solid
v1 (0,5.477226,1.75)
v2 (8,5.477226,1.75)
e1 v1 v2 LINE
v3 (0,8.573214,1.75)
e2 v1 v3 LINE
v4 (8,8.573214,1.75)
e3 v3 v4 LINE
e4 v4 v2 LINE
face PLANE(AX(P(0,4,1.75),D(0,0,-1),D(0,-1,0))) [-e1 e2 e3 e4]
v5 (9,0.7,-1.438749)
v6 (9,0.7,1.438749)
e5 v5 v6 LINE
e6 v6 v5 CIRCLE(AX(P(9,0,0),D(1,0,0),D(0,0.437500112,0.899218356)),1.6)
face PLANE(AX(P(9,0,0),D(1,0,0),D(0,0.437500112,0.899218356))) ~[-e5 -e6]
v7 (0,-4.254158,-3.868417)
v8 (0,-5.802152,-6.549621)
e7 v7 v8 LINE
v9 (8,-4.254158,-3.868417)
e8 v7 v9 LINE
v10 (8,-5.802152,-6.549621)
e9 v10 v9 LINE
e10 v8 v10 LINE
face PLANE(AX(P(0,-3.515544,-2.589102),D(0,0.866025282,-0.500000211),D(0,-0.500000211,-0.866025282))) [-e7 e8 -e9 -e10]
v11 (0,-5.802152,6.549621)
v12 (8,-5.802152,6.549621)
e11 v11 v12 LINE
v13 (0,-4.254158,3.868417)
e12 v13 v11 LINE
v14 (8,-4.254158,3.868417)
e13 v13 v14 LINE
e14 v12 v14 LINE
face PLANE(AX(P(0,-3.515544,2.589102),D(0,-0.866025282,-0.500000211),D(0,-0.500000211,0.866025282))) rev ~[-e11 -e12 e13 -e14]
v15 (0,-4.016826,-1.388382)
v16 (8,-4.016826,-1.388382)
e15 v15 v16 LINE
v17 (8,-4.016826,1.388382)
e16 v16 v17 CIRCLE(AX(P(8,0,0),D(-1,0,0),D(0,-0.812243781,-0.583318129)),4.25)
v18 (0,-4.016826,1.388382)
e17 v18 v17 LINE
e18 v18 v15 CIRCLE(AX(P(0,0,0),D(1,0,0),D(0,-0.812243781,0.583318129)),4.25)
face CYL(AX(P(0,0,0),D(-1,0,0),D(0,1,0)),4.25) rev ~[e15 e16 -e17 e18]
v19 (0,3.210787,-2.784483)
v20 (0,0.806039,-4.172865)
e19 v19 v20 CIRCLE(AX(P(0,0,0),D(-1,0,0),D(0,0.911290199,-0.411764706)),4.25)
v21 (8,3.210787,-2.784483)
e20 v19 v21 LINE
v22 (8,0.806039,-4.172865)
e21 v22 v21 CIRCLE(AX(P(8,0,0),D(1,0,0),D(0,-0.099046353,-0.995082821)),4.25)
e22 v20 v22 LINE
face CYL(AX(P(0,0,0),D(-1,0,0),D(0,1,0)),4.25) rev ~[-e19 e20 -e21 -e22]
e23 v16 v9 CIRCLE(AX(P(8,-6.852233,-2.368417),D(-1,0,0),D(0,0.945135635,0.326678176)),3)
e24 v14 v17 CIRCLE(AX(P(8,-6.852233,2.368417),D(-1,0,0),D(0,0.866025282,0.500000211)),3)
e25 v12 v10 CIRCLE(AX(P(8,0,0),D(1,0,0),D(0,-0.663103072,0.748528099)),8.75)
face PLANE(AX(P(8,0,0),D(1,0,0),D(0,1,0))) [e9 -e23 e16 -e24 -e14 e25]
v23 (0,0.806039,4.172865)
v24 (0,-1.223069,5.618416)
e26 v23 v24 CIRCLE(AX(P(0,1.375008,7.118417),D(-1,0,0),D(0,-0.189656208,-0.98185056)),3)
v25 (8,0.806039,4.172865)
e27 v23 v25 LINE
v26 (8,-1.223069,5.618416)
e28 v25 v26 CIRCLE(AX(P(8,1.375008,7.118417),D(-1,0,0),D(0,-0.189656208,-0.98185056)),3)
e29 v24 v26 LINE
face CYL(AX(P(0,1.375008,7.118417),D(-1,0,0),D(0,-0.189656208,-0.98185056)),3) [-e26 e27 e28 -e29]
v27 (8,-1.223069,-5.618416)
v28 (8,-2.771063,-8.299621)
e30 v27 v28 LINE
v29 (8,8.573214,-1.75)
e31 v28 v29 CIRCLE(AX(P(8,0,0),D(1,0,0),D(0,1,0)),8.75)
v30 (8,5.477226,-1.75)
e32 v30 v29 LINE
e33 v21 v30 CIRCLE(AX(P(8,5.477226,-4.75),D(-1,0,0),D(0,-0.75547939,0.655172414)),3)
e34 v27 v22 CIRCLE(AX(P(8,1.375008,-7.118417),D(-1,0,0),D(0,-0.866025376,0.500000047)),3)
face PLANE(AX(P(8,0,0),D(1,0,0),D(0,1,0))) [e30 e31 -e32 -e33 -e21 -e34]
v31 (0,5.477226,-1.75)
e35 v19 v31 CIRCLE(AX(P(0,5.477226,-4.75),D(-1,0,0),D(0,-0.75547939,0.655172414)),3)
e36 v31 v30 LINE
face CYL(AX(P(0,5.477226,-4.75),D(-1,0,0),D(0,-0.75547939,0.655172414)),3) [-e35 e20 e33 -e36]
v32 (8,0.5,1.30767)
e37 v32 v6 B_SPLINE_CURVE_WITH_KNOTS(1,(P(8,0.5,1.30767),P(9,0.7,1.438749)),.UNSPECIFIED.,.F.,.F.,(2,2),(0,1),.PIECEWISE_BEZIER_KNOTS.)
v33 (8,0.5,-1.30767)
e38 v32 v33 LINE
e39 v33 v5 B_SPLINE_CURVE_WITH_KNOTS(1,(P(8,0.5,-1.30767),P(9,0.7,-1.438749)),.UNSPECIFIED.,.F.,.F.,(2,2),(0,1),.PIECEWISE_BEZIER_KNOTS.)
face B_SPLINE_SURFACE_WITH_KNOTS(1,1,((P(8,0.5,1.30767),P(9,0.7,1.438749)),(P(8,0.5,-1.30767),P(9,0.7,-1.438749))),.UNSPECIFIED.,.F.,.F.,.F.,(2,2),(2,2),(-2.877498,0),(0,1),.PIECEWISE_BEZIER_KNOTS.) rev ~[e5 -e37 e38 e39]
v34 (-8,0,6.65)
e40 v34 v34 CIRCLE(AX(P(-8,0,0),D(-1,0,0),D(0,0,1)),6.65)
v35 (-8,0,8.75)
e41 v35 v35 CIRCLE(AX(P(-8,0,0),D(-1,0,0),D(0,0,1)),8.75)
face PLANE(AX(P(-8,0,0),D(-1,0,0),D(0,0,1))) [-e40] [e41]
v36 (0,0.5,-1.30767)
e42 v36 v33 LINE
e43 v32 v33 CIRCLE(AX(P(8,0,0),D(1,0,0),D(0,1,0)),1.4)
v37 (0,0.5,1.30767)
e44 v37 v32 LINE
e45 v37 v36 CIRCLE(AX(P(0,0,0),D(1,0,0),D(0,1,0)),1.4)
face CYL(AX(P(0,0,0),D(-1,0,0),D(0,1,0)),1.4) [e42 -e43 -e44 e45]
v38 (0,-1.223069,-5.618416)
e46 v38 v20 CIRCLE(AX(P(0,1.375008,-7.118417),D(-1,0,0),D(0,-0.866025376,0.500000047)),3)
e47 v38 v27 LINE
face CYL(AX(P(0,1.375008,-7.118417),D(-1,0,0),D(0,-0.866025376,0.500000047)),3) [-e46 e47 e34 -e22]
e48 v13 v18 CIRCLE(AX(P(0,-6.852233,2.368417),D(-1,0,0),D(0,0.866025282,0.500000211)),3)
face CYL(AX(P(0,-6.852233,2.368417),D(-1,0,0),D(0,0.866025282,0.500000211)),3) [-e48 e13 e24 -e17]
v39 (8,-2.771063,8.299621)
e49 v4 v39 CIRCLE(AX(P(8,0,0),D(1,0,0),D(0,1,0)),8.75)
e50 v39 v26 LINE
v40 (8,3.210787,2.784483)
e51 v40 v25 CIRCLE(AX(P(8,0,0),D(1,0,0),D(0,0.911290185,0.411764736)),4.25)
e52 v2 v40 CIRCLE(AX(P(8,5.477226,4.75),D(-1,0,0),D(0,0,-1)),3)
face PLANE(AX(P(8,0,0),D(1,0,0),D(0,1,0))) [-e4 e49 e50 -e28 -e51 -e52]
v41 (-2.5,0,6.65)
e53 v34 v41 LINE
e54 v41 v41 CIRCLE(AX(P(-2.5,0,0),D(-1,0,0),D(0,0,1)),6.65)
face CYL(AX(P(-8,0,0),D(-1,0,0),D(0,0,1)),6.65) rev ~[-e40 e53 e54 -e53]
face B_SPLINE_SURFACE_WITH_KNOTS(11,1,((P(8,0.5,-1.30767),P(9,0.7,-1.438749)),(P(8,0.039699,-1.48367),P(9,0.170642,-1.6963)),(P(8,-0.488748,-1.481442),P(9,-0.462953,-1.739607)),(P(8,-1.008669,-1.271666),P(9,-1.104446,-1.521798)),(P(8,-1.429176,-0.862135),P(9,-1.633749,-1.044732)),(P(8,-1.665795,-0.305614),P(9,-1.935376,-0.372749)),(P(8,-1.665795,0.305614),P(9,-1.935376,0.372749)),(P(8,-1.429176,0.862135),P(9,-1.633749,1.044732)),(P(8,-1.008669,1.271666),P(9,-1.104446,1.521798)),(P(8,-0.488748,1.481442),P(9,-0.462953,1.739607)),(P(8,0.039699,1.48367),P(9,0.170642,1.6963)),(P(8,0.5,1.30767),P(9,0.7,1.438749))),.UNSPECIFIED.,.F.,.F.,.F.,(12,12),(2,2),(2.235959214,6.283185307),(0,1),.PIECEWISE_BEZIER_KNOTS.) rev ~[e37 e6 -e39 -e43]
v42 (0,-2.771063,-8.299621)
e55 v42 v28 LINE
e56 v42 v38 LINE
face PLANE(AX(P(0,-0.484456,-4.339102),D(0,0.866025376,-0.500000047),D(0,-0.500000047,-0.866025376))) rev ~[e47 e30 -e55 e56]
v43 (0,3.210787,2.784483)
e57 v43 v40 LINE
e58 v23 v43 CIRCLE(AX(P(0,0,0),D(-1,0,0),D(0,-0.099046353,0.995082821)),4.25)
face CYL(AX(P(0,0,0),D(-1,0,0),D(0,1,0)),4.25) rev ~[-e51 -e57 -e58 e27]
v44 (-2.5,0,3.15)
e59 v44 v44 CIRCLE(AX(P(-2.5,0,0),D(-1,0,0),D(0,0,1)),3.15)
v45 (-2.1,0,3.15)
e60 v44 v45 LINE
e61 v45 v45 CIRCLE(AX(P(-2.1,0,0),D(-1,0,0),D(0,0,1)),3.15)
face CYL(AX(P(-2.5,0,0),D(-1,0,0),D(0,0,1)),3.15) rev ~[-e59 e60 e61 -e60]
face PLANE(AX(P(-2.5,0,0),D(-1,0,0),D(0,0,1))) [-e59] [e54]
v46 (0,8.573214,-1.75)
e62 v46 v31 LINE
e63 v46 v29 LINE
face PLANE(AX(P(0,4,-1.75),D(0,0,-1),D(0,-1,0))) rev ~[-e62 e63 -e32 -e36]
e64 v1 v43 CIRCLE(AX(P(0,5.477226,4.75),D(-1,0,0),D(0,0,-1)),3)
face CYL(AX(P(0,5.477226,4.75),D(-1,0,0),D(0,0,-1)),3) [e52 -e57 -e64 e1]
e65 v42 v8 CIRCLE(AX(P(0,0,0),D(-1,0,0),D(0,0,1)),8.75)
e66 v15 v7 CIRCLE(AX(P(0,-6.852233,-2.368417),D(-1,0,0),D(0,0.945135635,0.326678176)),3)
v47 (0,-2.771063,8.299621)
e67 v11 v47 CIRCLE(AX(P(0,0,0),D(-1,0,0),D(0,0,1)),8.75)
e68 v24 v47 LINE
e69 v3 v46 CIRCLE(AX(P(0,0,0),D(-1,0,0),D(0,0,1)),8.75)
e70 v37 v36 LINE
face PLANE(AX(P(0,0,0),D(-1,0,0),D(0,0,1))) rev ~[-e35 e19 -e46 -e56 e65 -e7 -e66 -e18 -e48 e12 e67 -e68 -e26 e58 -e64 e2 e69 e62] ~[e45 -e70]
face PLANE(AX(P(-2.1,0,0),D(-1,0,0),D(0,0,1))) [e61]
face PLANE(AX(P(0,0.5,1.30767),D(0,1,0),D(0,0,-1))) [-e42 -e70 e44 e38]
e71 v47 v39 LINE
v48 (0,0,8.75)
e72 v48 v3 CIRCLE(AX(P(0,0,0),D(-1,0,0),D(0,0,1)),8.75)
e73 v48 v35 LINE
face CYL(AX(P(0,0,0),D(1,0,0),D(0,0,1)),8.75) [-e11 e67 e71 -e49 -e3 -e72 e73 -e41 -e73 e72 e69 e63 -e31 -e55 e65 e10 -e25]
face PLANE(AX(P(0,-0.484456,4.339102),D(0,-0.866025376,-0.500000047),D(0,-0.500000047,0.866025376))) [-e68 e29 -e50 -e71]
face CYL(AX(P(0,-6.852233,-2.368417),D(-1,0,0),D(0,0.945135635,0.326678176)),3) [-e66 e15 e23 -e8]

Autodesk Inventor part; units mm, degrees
ref_plane "YZ Plane" through (0, 0, 0) normal (1, 0, 0) x (0, 1, 0)
ref_plane "XZ Plane" through (0, 0, 0) normal (0, 1, 0) x (-1, 0, 0)
sketch "Sketch1" plane through (0, 0, 0) normal (1, 0, 0) x (0, 1, 0)
  circle A0 centre (0, 0) radius 1.4
  line L0 (0.5, 1.30767) -> (0.5, -1.30767)
  dimension "d1" = 2.8
  dimension "d2" = 0.5
extrude "Extrusion1" add sketch "Sketch1" along normal blind 8 contours L0 A0 picked at (-0.62029, 0.295862)
sketch "Sketch2" plane through (0, 0, 0) normal (-1, 0, 0) x (0, 0, 1)
  circle A0 centre (0, 0) radius 8.75
  arc A1 (-1.30767, 0.5) -> (1.30767, 0.5) centre (0, 0) ccw
  dimension "d5" = 17.5
extrude "Extrusion2" add sketch "Sketch2" along normal blind 8
sketch "Sketch3" plane through (0, 0, 0) normal (1, 0, 0) x (0, 1, 0)
  circle A0 centre (0, 0) radius 4.25
  line L0 (4, 1.75) -> (8.573214, 1.75)
  line L1 (4, -1.75) -> (8.573214, -1.75)
  line L2 (-10.5, 0) -> (10.5, 0)
  circle A1 centre (0, 0) radius 8.75
  line L3 (0.5, -1.30767) -> (0.5, 1.30767)
  arc A2 (0.5, 1.30767) -> (0.5, -1.30767) centre (0, 0) ccw
  arc A3 (3.820225, 1.86236) -> (4, 1.75) centre (4, 1.95) ccw
  arc A4 (4, -1.75) -> (3.820225, -1.86236) centre (4, -1.95) ccw
  line L4 (-3.515544, 2.589102) -> (-5.802152, 6.549621)
  line L5 (-0.484456, 4.339102) -> (-2.771063, 8.299621)
  arc A5 (-0.484456, 4.339102) -> (-0.297262, 4.239591) centre (-0.31125, 4.439102) ccw
  arc A6 (-3.522963, 2.377232) -> (-3.515544, 2.589102) centre (-3.68875, 2.489102) ccw
  line L6 (-0.484456, -4.339102) -> (-2.771063, -8.299621)
  line L7 (-3.515544, -2.589102) -> (-5.802152, -6.549621)
  arc A7 (-3.515544, -2.589102) -> (-3.522963, -2.377232) centre (-3.68875, -2.489102) ccw
  arc A8 (-0.297262, -4.239591) -> (-0.484456, -4.339102) centre (-0.31125, -4.439102) ccw
  arc A9 (0.5, 1.30767) -> (0.5, -1.30767) centre (0, 0) ccw
  circle A10 centre (0, 0) radius 5
  line L8 (4, 1.75) -> (3.872983, 1.75)
  line L9 (4, -1.75) -> (3.840573, -1.75)
  line L10 (-0.484456, -4.339102) -> (-0.420947, -4.229102)
  line L11 (-3.515544, -2.589102) -> (-3.452036, -2.479102)
  line L12 (-3.515544, 2.589102) -> (-3.452036, 2.479102)
  line L13 (-0.484456, 4.339102) -> (-0.420947, 4.229102)
  point P0 (-3.522963, -2.377232)
  point P1 (-4.25, 0)
  point P2 (-8.75, 0)
  point P3 (-5.802152, -6.549621)
  point P4 (-0.297262, -4.239591)
  point P5 (-2.771063, -8.299621)
  point P6 (8.573214, -1.75)
  point P7 (-0.297262, 4.239591)
  point P8 (-3.522963, 2.377232)
  point P9 (-5.802152, 6.549621)
  point P10 (3.872983, -1.75)
  dimension "d8" = 8.5
  dimension "d9" = 3.5
  dimension "d10" = 4
  dimension "d14" = 360
  dimension "d22" = 10
extrude "Extrusion3" add sketch "Sketch3" along normal blind 8 contours A0 A3 L8 | L9 A4 A0 | A0 A5 L5 A10 L0 A3 | A4 L1 A10 L6 A8 A0 | A10 L5 A1 L0 | L1 A1 L6 A10 | A0 L13 A5 | A8 L10 A0 | L2 A10 L4 A6 A0 | A0 A7 L7 A10 L2 | A10 L2 A1 L4 | L7 A1 L2 A10 | A6 L12 A0 | A0 L11 A7
sketch "Sketch4" plane through (-8, 0, 0) normal (-1, 0, 0) x (0, 0, 1)
  circle A0 centre (0, 0) radius 6.65
  dimension "d19" = 13.3
extrude "Extrusion4" cut sketch "Sketch4" against normal blind 5.5
fillet "Fillet1" radius 3 6 edges at (4, 3.873, 1.75) (4, -0.4209, 4.2291) (4, 3.873, -1.75) (4, -0.4209, -4.2291) (4, -3.452, -2.4791) (4, -3.452, 2.4791)
sketch "Sketch5" plane through (-2.5, 0, 0) normal (-1, 0, 0) x (0, 0, 1)
  circle A0 centre (0, 0) radius 2.5
  dimension "d24" = 5
extrude "Extrusion5" [suppressed]
sketch "Sketch6" plane through (-22, 0, 0) normal (-1, 0, 0) x (0, 0, 1)
  arc A0 (-1.2, 0.5) -> (1.2, 0.5) centre (0, 0) ccw projected
  circle A1 centre (0, 0) radius 2.5 projected
ref_plane "Work Plane1" through (9, 0, 0) normal (1, 0, 0) x (0, 0, -1)
sketch "Sketch7" plane through (9, 0, 0) normal (1, 0, 0) x (0, 0, -1)
  arc A0 (-1.30767, 0.5) -> (1.30767, 0.5) centre (0, 0) ccw
  line L0 (1.30767, 0.5) -> (-1.30767, 0.5)
  circle A1 centre (0, 0) radius 1.6
  line L1 (-1.438749, 0.7) -> (1.438749, 0.7)
  dimension "d28" = 3.2
  dimension "d30" = 0.5
  dimension "d31" = 0.7
sketch "Sketch8" plane through (8, 0, 0) normal (1, 0, 0) x (0, 0, -1)
  arc A0 (-1.30767, 0.5) -> (1.30767, 0.5) centre (0, 0) ccw
  line L0 (1.30767, 0.5) -> (-1.30767, 0.5)
sketch "Sketch7 outline for Loft1" plane through (9, 0, 0) normal (1, 0, 0) x (0, 0, -1)
  line L0 (1.438749, 0.7) -> (-1.438749, 0.7)
  arc A0 (-1.438749, 0.7) -> (1.438749, 0.7) centre (0, 0) ccw
loft "Loft1" add profiles "Sketch7 outline for Loft1" section 1 edges at (8, -1.4, 0) (8, 0.5, 0)
sketch "Sketch9" plane through (-2.5, 0, 0) normal (-1, 0, 0) x (0, 0, 1)
  circle A0 centre (0, 0) radius 3.15
  dimension "d36" = 6.3
extrude "Extrusion6" cut sketch "Sketch9" against normal blind 0.4
properties part number "front wheel mount"
